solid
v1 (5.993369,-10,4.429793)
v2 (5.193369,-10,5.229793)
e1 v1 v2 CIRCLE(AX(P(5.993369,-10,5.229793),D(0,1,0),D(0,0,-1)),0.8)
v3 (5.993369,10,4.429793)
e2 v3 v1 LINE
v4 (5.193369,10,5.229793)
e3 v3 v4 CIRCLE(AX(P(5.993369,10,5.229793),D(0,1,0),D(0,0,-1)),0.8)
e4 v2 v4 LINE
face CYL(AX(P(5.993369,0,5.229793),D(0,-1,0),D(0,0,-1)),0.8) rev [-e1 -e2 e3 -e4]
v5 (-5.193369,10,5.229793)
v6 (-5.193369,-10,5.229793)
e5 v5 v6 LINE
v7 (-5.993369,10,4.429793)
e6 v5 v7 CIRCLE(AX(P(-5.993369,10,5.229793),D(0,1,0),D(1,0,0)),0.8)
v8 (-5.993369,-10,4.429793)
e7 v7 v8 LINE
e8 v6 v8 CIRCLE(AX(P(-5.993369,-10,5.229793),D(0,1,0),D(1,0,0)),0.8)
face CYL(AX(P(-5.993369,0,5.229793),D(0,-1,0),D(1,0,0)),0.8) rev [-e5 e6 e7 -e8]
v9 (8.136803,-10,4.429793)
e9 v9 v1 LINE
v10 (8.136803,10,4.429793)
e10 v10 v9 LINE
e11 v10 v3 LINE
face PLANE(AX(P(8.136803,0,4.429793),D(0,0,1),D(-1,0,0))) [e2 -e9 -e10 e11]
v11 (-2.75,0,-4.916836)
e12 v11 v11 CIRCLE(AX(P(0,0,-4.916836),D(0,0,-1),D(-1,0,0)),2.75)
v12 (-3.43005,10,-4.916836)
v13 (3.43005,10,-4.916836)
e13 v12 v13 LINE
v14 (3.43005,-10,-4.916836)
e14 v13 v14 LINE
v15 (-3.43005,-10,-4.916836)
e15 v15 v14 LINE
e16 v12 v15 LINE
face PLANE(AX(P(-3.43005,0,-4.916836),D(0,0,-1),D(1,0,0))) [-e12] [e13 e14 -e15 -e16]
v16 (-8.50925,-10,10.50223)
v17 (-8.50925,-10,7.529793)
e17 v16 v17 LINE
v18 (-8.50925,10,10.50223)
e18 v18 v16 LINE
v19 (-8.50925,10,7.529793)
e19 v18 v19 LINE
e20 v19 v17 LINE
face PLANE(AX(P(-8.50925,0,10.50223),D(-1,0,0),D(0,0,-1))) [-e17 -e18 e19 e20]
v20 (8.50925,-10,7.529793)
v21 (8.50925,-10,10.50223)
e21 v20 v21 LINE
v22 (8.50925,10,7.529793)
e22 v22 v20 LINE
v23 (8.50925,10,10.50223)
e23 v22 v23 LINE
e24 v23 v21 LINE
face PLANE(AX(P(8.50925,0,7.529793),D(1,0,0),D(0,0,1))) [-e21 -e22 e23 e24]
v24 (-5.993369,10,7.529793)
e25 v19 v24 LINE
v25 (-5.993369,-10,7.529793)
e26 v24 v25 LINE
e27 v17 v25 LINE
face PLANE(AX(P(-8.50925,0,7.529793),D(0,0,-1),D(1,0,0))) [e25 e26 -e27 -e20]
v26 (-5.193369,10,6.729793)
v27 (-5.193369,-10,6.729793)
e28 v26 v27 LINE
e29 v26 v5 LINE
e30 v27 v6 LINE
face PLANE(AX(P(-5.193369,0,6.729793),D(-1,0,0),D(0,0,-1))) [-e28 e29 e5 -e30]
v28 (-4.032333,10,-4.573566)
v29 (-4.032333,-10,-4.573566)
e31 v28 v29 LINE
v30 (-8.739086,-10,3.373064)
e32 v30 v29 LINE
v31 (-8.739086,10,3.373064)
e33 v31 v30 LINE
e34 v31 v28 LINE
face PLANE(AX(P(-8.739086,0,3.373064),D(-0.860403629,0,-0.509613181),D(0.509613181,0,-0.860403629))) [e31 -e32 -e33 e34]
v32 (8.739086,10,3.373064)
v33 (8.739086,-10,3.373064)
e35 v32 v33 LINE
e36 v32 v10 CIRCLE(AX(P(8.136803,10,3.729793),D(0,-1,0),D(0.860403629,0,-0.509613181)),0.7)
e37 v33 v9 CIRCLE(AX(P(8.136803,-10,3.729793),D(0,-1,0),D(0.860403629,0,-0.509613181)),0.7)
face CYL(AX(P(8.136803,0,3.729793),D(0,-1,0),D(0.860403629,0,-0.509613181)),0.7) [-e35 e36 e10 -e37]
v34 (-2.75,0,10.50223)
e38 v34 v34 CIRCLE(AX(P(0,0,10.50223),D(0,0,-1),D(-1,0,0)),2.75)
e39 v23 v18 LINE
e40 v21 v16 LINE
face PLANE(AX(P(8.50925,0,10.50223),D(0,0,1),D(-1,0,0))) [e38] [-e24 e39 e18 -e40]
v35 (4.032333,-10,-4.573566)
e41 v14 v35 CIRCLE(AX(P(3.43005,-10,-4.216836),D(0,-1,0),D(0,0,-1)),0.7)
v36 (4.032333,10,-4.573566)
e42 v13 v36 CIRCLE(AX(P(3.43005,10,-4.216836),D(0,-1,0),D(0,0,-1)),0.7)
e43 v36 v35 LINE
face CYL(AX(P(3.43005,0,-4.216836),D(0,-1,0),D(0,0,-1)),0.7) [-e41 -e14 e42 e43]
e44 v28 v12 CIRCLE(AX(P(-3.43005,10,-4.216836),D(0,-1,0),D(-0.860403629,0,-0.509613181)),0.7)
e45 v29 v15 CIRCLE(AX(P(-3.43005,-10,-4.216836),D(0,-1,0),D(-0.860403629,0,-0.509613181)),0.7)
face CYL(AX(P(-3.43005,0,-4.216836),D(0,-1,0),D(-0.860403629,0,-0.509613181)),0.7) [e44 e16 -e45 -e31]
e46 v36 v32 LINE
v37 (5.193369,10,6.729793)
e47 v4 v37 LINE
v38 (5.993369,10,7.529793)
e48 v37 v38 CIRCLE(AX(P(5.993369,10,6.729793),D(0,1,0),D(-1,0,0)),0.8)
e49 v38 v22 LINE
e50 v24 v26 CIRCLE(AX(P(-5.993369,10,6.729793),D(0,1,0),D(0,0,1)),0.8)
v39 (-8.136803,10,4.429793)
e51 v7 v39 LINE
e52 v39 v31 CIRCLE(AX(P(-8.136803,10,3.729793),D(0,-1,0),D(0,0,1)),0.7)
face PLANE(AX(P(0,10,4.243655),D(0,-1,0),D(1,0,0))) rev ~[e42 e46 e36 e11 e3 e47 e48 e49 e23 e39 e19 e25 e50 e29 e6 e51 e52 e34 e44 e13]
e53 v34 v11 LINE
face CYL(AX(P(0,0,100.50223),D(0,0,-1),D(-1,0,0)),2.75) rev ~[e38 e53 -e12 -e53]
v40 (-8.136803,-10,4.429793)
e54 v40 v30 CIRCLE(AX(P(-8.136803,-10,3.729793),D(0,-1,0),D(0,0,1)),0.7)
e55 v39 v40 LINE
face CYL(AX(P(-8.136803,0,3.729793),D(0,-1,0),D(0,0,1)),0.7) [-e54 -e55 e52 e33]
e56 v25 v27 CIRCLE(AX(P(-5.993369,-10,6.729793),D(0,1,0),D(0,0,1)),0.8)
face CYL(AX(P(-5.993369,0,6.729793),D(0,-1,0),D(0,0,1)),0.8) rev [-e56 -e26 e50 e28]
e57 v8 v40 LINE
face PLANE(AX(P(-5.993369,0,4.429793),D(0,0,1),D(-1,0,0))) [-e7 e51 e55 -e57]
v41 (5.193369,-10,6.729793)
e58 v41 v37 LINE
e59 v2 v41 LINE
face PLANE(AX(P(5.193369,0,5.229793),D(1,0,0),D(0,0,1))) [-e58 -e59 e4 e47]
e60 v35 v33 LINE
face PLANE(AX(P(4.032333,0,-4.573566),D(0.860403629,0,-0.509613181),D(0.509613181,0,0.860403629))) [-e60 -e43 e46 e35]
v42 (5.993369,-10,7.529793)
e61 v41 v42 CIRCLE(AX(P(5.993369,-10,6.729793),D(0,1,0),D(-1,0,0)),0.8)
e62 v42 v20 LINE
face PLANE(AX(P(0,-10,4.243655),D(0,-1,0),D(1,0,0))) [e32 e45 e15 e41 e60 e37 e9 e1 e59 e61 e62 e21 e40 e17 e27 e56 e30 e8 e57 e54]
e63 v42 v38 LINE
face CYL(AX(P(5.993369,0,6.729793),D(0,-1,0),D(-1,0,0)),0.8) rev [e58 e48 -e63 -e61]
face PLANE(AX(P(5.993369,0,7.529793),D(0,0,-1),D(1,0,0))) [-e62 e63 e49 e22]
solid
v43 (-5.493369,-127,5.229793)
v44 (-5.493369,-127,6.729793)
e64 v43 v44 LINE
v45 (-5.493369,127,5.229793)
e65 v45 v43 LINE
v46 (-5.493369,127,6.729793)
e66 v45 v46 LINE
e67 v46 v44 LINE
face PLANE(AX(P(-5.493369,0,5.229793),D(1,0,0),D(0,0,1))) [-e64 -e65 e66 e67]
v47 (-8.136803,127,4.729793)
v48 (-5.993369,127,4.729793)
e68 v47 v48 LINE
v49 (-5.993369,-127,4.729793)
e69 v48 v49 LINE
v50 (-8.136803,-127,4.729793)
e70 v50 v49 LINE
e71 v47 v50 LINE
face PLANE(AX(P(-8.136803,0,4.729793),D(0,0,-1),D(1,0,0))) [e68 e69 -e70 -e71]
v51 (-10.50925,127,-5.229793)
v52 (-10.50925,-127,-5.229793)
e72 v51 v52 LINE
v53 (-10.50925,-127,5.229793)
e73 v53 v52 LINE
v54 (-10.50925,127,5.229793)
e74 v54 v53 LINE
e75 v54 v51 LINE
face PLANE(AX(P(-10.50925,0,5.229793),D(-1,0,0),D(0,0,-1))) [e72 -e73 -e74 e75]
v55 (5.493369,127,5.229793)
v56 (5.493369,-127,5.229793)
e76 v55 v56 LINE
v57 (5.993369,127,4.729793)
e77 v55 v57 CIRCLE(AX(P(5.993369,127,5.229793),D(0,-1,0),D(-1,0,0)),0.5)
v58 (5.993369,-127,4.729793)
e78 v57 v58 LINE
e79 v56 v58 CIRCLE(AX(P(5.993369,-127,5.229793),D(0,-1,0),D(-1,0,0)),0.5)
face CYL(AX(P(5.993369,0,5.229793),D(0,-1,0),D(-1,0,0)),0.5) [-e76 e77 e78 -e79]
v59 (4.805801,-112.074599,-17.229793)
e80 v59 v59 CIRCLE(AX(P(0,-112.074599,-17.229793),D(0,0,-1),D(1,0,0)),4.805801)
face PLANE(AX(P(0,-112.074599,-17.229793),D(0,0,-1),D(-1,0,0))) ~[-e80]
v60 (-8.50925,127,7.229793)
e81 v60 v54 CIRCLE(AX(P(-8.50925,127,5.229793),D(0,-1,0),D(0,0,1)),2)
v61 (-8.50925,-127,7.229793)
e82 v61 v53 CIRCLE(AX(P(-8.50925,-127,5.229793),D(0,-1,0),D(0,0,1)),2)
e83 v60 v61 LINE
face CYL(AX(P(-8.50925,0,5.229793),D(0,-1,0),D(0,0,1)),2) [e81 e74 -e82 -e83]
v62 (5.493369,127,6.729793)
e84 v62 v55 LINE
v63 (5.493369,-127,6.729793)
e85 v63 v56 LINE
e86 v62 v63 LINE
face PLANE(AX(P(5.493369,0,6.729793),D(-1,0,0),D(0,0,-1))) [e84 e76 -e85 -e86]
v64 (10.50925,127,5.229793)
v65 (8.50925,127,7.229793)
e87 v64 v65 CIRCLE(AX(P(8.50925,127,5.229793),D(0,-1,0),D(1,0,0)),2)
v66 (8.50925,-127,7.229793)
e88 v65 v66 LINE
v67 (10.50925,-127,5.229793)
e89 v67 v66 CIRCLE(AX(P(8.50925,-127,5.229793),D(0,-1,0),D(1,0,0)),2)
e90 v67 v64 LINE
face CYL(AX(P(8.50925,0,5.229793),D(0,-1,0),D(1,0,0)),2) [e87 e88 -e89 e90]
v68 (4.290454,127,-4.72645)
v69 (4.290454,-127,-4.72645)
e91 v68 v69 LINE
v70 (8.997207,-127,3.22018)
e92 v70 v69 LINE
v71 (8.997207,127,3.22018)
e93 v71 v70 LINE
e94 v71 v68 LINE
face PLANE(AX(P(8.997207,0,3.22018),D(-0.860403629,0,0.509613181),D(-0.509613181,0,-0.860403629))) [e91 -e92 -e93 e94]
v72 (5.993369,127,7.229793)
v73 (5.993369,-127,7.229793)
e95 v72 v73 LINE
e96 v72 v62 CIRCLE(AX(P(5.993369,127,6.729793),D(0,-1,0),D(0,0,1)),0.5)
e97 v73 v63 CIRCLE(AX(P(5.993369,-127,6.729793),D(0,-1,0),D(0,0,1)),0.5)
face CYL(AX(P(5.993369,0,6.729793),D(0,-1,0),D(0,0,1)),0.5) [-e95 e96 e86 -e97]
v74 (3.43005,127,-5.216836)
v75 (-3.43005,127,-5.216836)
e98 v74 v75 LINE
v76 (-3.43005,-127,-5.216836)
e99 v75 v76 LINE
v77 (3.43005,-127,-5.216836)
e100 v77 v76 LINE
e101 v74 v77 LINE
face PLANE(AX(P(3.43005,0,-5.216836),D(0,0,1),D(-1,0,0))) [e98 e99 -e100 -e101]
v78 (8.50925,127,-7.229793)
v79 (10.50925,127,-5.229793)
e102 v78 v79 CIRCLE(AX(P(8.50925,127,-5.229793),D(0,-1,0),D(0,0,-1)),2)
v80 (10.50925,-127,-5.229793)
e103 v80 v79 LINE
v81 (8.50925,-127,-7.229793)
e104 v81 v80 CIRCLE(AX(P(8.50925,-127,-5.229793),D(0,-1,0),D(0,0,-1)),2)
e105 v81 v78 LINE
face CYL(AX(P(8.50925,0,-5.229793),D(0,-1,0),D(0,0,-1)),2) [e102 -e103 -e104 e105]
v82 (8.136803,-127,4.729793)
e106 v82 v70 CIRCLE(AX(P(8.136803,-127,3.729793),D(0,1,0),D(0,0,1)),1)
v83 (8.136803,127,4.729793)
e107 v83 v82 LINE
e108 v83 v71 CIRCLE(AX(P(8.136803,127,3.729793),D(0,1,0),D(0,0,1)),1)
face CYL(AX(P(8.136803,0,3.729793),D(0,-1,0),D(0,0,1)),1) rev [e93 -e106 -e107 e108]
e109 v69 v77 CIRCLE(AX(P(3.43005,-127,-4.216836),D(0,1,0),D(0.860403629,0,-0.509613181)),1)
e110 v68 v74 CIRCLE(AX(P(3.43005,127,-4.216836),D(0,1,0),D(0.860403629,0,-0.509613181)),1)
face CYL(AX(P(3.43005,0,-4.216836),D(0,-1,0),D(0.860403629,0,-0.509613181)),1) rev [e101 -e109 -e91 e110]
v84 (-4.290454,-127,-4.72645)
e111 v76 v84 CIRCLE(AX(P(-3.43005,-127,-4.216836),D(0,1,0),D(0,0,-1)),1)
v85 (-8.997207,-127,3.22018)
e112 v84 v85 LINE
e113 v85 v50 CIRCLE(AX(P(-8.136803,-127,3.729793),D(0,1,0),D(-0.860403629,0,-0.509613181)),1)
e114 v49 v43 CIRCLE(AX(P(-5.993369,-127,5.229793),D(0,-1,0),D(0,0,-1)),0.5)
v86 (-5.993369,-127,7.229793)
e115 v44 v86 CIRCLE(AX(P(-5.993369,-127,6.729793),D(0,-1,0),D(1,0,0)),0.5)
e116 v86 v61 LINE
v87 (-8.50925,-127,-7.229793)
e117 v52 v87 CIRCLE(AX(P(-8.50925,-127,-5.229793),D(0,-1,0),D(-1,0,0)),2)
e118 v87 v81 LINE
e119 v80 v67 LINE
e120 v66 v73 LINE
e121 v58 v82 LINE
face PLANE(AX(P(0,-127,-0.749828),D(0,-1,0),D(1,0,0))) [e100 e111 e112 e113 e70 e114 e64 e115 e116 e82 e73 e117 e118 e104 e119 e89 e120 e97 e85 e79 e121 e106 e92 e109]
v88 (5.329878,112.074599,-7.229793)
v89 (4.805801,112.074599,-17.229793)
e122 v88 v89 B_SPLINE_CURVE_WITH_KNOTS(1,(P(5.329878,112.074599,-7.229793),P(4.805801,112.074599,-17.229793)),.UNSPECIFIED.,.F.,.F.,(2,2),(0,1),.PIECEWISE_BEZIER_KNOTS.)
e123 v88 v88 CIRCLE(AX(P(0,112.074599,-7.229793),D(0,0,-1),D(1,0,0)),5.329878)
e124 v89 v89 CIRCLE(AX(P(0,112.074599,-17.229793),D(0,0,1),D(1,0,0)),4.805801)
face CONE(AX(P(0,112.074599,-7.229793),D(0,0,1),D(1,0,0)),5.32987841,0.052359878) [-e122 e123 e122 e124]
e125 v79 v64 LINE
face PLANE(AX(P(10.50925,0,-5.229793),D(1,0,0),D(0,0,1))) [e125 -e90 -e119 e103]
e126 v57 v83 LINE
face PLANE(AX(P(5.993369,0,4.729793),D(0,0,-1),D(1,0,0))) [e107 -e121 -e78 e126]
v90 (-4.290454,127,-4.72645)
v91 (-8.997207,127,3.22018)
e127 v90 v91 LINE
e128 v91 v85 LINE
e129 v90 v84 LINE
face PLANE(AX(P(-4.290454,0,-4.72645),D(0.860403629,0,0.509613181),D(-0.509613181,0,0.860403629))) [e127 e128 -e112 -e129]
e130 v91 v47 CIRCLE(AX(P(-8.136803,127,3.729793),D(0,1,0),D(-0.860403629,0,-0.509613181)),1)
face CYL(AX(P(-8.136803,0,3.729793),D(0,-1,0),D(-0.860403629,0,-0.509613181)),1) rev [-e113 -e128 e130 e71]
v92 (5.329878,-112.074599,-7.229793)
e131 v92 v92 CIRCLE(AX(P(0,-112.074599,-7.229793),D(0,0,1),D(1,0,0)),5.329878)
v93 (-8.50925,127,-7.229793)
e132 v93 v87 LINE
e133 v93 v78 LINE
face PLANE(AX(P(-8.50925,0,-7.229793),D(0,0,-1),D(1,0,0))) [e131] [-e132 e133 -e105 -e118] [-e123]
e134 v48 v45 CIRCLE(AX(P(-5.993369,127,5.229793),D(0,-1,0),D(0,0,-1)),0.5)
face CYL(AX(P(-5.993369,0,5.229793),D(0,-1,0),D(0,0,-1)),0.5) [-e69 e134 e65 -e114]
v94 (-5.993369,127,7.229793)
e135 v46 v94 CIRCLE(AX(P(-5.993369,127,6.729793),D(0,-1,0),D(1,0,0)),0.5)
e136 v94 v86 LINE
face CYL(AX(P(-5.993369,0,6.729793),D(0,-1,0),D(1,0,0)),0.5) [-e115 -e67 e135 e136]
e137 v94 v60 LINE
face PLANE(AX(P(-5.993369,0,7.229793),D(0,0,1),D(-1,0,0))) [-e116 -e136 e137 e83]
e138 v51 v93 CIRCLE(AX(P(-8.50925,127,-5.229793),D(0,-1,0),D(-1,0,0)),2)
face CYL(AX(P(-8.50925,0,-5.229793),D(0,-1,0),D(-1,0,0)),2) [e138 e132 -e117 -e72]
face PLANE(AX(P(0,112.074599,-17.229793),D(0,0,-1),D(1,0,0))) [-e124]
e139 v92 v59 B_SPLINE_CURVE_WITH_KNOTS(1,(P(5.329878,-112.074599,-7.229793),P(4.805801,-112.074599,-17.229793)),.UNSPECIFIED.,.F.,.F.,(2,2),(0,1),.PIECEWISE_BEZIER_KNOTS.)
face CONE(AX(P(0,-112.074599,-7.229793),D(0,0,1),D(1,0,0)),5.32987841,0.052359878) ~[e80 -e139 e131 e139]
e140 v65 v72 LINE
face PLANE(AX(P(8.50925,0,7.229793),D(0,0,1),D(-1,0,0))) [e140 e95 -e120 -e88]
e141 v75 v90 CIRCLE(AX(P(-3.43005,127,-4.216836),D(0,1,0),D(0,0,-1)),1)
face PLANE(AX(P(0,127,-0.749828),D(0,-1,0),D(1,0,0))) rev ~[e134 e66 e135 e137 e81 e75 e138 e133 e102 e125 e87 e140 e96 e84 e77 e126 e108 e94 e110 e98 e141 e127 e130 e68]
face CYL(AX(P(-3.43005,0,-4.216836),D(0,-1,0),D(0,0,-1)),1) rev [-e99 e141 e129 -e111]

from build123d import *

# Parameters (mm, degrees)
F1_DEPTH = 127
F3_DEPTH = 10
F5_D     = 5.5
F5_DEPTH = 90
F5_TIP   = 1.6523667023
F6_R     = 5.3298784099
F7_DEPTH = 10
F7_TAPER = 3


# Not quite as in the source:
# - a pattern or mirror of a feature is missing from the dataset's text; its kind, count and spacing are read off the source's solid


with BuildPart() as f1:
    # F0 (on Front) → F1 (new body, symmetric)
    with BuildSketch(Plane.XZ):
        with BuildLine():
            ThreePointArc((10.5092503586, 5.2297932934), (9.923463921, 6.6440068557), (8.5092503586, 7.2297932934))
            Line((8.5092503586, 7.2297932934), (5.9933694905, 7.2297932934))
            ThreePointArc((5.9933694905, 7.2297932934), (5.6398160999, 7.083346684), (5.4933694905, 6.7297932934))
            Line((5.4933694905, 6.7297932934), (5.4933694905, 5.2297932934))
            ThreePointArc((5.4933694905, 5.2297932934), (5.6398160999, 4.8762399028), (5.9933694905, 4.7297932934))
            Line((5.9933694905, 4.7297932934), (8.1368030805, 4.7297932934))
            ThreePointArc((8.1368030805, 4.7297932934), (9.0055991387, 4.2249633746), (8.9972067099, 3.220180112))
            Line((8.9972067099, 3.220180112), (4.2904538965, -4.726449511))
            ThreePointArc((4.2904538965, -4.726449511), (3.9252203484, -5.0856323878), (3.4300502672, -5.2168363297))
            Line((3.4300502672, -5.2168363297), (0, -5.2168363297))
            Line((0, -5.2168363297), (-3.4300502672, -5.2168363297))
            ThreePointArc((-3.4300502672, -5.2168363297), (-3.9252203484, -5.0856323878), (-4.2904538965, -4.726449511))
            Line((-4.2904538965, -4.726449511), (-8.9972067099, 3.220180112))
            ThreePointArc((-8.9972067099, 3.220180112), (-9.0055991387, 4.2249633746), (-8.1368030805, 4.7297932934))
            Line((-8.1368030805, 4.7297932934), (-5.9933694905, 4.7297932934))
            ThreePointArc((-5.9933694905, 4.7297932934), (-5.6398160999, 4.8762399028), (-5.4933694905, 5.2297932934))
            Line((-5.4933694905, 5.2297932934), (-5.4933694905, 6.7297932934))
            ThreePointArc((-5.4933694905, 6.7297932934), (-5.6398160999, 7.083346684), (-5.9933694905, 7.2297932934))
            Line((-5.9933694905, 7.2297932934), (-8.5092503586, 7.2297932934))
            ThreePointArc((-8.5092503586, 7.2297932934), (-9.923463921, 6.6440068557), (-10.5092503586, 5.2297932934))
            Line((-10.5092503586, 5.2297932934), (-10.5092503586, -5.2297932934))
            ThreePointArc((-10.5092503586, -5.2297932934), (-9.923463921, -6.6440068557), (-8.5092503586, -7.2297932934))
            Line((-8.5092503586, -7.2297932934), (8.5092503586, -7.2297932934))
            ThreePointArc((8.5092503586, -7.2297932934), (9.923463921, -6.6440068557), (10.5092503586, -5.2297932934))
            Line((10.5092503586, -5.2297932934), (10.5092503586, 5.2297932934))
        make_face()
    extrude(amount=F1_DEPTH, both=True)

    # F6 (on face) → F7 (join)
    with BuildSketch(Plane(origin=(0, 0, -7.2297932934), x_dir=(1, 0, 0), z_dir=(0, 0, -1))):
        with Locations((0, -112.07459867)):
            Circle(F6_R)
    f7 = extrude(amount=F7_DEPTH, taper=F7_TAPER)

    # F7_copies: F7 across plane
    add(f7.mirror(Plane(origin=(0, 0, 0), x_dir=(0, 0, -1), z_dir=(0, -1, 0))))


with BuildPart() as f3:
    # F2 (on Front) → F3 (new body, symmetric)
    with BuildSketch(Plane.XZ):
        with BuildLine():
            Line((5.9933694905, 7.5297932934), (8.5092503586, 7.5297932934))
            Line((8.5092503586, 7.5297932934), (8.5092503586, 10.502230376))
            Line((8.5092503586, 10.502230376), (-8.5092503586, 10.502230376))
            Line((-8.5092503586, 10.502230376), (-8.5092503586, 7.5297932934))
            Line((-8.5092503586, 7.5297932934), (-5.9933694905, 7.5297932934))
            ThreePointArc((-5.9933694905, 7.5297932934), (-5.4276840655, 7.2954787183), (-5.1933694905, 6.7297932934))
            Line((-5.1933694905, 6.7297932934), (-5.1933694905, 5.2297932934))
            ThreePointArc((-5.1933694905, 5.2297932934), (-5.4276840655, 4.6641078684), (-5.9933694905, 4.4297932934))
            Line((-5.9933694905, 4.4297932934), (-8.1368030805, 4.4297932934))
            ThreePointArc((-8.1368030805, 4.4297932934), (-8.7449603212, 4.0764123502), (-8.7390856211, 3.3730640664))
            Line((-8.7390856211, 3.3730640664), (-4.0323328077, -4.5735655566))
            ThreePointArc((-4.0323328077, -4.5735655566), (-3.776669324, -4.8249935704), (-3.4300502672, -4.9168363297))
            Line((-3.4300502672, -4.9168363297), (3.4300502672, -4.9168363297))
            ThreePointArc((3.4300502672, -4.9168363859), (3.7766693519, -4.8249936193), (4.0323328561, -4.5735655853))
            Line((4.0323328077, -4.5735655566), (8.7390856211, 3.3730640664))
            ThreePointArc((8.7390856211, 3.3730640664), (8.7449603212, 4.0764123502), (8.1368030805, 4.4297932934))
            Line((8.1368030805, 4.4297932934), (5.9933694905, 4.4297932934))
            ThreePointArc((5.9933694905, 4.4297932934), (5.4276840655, 4.6641078684), (5.1933694905, 5.2297932934))
            Line((5.1933694905, 5.2297932934), (5.1933694905, 6.7297932934))
            ThreePointArc((5.1933694905, 6.7297932934), (5.4276840655, 7.2954787183), (5.9933694905, 7.5297932934))
        make_face()
    extrude(amount=F3_DEPTH, both=True)

    # F5
    with Locations(Plane.XY.offset(10.502230376)):
        with Locations((0, 0)):
            Hole(F5_D / 2, depth=F5_DEPTH)
            with Locations((0, 0, -(F5_DEPTH + F5_TIP / 2))):  # 118° drill point
                Cone(0, F5_D / 2, F5_TIP, mode=Mode.SUBTRACT)


solid = Compound([f1.part, f3.part])
